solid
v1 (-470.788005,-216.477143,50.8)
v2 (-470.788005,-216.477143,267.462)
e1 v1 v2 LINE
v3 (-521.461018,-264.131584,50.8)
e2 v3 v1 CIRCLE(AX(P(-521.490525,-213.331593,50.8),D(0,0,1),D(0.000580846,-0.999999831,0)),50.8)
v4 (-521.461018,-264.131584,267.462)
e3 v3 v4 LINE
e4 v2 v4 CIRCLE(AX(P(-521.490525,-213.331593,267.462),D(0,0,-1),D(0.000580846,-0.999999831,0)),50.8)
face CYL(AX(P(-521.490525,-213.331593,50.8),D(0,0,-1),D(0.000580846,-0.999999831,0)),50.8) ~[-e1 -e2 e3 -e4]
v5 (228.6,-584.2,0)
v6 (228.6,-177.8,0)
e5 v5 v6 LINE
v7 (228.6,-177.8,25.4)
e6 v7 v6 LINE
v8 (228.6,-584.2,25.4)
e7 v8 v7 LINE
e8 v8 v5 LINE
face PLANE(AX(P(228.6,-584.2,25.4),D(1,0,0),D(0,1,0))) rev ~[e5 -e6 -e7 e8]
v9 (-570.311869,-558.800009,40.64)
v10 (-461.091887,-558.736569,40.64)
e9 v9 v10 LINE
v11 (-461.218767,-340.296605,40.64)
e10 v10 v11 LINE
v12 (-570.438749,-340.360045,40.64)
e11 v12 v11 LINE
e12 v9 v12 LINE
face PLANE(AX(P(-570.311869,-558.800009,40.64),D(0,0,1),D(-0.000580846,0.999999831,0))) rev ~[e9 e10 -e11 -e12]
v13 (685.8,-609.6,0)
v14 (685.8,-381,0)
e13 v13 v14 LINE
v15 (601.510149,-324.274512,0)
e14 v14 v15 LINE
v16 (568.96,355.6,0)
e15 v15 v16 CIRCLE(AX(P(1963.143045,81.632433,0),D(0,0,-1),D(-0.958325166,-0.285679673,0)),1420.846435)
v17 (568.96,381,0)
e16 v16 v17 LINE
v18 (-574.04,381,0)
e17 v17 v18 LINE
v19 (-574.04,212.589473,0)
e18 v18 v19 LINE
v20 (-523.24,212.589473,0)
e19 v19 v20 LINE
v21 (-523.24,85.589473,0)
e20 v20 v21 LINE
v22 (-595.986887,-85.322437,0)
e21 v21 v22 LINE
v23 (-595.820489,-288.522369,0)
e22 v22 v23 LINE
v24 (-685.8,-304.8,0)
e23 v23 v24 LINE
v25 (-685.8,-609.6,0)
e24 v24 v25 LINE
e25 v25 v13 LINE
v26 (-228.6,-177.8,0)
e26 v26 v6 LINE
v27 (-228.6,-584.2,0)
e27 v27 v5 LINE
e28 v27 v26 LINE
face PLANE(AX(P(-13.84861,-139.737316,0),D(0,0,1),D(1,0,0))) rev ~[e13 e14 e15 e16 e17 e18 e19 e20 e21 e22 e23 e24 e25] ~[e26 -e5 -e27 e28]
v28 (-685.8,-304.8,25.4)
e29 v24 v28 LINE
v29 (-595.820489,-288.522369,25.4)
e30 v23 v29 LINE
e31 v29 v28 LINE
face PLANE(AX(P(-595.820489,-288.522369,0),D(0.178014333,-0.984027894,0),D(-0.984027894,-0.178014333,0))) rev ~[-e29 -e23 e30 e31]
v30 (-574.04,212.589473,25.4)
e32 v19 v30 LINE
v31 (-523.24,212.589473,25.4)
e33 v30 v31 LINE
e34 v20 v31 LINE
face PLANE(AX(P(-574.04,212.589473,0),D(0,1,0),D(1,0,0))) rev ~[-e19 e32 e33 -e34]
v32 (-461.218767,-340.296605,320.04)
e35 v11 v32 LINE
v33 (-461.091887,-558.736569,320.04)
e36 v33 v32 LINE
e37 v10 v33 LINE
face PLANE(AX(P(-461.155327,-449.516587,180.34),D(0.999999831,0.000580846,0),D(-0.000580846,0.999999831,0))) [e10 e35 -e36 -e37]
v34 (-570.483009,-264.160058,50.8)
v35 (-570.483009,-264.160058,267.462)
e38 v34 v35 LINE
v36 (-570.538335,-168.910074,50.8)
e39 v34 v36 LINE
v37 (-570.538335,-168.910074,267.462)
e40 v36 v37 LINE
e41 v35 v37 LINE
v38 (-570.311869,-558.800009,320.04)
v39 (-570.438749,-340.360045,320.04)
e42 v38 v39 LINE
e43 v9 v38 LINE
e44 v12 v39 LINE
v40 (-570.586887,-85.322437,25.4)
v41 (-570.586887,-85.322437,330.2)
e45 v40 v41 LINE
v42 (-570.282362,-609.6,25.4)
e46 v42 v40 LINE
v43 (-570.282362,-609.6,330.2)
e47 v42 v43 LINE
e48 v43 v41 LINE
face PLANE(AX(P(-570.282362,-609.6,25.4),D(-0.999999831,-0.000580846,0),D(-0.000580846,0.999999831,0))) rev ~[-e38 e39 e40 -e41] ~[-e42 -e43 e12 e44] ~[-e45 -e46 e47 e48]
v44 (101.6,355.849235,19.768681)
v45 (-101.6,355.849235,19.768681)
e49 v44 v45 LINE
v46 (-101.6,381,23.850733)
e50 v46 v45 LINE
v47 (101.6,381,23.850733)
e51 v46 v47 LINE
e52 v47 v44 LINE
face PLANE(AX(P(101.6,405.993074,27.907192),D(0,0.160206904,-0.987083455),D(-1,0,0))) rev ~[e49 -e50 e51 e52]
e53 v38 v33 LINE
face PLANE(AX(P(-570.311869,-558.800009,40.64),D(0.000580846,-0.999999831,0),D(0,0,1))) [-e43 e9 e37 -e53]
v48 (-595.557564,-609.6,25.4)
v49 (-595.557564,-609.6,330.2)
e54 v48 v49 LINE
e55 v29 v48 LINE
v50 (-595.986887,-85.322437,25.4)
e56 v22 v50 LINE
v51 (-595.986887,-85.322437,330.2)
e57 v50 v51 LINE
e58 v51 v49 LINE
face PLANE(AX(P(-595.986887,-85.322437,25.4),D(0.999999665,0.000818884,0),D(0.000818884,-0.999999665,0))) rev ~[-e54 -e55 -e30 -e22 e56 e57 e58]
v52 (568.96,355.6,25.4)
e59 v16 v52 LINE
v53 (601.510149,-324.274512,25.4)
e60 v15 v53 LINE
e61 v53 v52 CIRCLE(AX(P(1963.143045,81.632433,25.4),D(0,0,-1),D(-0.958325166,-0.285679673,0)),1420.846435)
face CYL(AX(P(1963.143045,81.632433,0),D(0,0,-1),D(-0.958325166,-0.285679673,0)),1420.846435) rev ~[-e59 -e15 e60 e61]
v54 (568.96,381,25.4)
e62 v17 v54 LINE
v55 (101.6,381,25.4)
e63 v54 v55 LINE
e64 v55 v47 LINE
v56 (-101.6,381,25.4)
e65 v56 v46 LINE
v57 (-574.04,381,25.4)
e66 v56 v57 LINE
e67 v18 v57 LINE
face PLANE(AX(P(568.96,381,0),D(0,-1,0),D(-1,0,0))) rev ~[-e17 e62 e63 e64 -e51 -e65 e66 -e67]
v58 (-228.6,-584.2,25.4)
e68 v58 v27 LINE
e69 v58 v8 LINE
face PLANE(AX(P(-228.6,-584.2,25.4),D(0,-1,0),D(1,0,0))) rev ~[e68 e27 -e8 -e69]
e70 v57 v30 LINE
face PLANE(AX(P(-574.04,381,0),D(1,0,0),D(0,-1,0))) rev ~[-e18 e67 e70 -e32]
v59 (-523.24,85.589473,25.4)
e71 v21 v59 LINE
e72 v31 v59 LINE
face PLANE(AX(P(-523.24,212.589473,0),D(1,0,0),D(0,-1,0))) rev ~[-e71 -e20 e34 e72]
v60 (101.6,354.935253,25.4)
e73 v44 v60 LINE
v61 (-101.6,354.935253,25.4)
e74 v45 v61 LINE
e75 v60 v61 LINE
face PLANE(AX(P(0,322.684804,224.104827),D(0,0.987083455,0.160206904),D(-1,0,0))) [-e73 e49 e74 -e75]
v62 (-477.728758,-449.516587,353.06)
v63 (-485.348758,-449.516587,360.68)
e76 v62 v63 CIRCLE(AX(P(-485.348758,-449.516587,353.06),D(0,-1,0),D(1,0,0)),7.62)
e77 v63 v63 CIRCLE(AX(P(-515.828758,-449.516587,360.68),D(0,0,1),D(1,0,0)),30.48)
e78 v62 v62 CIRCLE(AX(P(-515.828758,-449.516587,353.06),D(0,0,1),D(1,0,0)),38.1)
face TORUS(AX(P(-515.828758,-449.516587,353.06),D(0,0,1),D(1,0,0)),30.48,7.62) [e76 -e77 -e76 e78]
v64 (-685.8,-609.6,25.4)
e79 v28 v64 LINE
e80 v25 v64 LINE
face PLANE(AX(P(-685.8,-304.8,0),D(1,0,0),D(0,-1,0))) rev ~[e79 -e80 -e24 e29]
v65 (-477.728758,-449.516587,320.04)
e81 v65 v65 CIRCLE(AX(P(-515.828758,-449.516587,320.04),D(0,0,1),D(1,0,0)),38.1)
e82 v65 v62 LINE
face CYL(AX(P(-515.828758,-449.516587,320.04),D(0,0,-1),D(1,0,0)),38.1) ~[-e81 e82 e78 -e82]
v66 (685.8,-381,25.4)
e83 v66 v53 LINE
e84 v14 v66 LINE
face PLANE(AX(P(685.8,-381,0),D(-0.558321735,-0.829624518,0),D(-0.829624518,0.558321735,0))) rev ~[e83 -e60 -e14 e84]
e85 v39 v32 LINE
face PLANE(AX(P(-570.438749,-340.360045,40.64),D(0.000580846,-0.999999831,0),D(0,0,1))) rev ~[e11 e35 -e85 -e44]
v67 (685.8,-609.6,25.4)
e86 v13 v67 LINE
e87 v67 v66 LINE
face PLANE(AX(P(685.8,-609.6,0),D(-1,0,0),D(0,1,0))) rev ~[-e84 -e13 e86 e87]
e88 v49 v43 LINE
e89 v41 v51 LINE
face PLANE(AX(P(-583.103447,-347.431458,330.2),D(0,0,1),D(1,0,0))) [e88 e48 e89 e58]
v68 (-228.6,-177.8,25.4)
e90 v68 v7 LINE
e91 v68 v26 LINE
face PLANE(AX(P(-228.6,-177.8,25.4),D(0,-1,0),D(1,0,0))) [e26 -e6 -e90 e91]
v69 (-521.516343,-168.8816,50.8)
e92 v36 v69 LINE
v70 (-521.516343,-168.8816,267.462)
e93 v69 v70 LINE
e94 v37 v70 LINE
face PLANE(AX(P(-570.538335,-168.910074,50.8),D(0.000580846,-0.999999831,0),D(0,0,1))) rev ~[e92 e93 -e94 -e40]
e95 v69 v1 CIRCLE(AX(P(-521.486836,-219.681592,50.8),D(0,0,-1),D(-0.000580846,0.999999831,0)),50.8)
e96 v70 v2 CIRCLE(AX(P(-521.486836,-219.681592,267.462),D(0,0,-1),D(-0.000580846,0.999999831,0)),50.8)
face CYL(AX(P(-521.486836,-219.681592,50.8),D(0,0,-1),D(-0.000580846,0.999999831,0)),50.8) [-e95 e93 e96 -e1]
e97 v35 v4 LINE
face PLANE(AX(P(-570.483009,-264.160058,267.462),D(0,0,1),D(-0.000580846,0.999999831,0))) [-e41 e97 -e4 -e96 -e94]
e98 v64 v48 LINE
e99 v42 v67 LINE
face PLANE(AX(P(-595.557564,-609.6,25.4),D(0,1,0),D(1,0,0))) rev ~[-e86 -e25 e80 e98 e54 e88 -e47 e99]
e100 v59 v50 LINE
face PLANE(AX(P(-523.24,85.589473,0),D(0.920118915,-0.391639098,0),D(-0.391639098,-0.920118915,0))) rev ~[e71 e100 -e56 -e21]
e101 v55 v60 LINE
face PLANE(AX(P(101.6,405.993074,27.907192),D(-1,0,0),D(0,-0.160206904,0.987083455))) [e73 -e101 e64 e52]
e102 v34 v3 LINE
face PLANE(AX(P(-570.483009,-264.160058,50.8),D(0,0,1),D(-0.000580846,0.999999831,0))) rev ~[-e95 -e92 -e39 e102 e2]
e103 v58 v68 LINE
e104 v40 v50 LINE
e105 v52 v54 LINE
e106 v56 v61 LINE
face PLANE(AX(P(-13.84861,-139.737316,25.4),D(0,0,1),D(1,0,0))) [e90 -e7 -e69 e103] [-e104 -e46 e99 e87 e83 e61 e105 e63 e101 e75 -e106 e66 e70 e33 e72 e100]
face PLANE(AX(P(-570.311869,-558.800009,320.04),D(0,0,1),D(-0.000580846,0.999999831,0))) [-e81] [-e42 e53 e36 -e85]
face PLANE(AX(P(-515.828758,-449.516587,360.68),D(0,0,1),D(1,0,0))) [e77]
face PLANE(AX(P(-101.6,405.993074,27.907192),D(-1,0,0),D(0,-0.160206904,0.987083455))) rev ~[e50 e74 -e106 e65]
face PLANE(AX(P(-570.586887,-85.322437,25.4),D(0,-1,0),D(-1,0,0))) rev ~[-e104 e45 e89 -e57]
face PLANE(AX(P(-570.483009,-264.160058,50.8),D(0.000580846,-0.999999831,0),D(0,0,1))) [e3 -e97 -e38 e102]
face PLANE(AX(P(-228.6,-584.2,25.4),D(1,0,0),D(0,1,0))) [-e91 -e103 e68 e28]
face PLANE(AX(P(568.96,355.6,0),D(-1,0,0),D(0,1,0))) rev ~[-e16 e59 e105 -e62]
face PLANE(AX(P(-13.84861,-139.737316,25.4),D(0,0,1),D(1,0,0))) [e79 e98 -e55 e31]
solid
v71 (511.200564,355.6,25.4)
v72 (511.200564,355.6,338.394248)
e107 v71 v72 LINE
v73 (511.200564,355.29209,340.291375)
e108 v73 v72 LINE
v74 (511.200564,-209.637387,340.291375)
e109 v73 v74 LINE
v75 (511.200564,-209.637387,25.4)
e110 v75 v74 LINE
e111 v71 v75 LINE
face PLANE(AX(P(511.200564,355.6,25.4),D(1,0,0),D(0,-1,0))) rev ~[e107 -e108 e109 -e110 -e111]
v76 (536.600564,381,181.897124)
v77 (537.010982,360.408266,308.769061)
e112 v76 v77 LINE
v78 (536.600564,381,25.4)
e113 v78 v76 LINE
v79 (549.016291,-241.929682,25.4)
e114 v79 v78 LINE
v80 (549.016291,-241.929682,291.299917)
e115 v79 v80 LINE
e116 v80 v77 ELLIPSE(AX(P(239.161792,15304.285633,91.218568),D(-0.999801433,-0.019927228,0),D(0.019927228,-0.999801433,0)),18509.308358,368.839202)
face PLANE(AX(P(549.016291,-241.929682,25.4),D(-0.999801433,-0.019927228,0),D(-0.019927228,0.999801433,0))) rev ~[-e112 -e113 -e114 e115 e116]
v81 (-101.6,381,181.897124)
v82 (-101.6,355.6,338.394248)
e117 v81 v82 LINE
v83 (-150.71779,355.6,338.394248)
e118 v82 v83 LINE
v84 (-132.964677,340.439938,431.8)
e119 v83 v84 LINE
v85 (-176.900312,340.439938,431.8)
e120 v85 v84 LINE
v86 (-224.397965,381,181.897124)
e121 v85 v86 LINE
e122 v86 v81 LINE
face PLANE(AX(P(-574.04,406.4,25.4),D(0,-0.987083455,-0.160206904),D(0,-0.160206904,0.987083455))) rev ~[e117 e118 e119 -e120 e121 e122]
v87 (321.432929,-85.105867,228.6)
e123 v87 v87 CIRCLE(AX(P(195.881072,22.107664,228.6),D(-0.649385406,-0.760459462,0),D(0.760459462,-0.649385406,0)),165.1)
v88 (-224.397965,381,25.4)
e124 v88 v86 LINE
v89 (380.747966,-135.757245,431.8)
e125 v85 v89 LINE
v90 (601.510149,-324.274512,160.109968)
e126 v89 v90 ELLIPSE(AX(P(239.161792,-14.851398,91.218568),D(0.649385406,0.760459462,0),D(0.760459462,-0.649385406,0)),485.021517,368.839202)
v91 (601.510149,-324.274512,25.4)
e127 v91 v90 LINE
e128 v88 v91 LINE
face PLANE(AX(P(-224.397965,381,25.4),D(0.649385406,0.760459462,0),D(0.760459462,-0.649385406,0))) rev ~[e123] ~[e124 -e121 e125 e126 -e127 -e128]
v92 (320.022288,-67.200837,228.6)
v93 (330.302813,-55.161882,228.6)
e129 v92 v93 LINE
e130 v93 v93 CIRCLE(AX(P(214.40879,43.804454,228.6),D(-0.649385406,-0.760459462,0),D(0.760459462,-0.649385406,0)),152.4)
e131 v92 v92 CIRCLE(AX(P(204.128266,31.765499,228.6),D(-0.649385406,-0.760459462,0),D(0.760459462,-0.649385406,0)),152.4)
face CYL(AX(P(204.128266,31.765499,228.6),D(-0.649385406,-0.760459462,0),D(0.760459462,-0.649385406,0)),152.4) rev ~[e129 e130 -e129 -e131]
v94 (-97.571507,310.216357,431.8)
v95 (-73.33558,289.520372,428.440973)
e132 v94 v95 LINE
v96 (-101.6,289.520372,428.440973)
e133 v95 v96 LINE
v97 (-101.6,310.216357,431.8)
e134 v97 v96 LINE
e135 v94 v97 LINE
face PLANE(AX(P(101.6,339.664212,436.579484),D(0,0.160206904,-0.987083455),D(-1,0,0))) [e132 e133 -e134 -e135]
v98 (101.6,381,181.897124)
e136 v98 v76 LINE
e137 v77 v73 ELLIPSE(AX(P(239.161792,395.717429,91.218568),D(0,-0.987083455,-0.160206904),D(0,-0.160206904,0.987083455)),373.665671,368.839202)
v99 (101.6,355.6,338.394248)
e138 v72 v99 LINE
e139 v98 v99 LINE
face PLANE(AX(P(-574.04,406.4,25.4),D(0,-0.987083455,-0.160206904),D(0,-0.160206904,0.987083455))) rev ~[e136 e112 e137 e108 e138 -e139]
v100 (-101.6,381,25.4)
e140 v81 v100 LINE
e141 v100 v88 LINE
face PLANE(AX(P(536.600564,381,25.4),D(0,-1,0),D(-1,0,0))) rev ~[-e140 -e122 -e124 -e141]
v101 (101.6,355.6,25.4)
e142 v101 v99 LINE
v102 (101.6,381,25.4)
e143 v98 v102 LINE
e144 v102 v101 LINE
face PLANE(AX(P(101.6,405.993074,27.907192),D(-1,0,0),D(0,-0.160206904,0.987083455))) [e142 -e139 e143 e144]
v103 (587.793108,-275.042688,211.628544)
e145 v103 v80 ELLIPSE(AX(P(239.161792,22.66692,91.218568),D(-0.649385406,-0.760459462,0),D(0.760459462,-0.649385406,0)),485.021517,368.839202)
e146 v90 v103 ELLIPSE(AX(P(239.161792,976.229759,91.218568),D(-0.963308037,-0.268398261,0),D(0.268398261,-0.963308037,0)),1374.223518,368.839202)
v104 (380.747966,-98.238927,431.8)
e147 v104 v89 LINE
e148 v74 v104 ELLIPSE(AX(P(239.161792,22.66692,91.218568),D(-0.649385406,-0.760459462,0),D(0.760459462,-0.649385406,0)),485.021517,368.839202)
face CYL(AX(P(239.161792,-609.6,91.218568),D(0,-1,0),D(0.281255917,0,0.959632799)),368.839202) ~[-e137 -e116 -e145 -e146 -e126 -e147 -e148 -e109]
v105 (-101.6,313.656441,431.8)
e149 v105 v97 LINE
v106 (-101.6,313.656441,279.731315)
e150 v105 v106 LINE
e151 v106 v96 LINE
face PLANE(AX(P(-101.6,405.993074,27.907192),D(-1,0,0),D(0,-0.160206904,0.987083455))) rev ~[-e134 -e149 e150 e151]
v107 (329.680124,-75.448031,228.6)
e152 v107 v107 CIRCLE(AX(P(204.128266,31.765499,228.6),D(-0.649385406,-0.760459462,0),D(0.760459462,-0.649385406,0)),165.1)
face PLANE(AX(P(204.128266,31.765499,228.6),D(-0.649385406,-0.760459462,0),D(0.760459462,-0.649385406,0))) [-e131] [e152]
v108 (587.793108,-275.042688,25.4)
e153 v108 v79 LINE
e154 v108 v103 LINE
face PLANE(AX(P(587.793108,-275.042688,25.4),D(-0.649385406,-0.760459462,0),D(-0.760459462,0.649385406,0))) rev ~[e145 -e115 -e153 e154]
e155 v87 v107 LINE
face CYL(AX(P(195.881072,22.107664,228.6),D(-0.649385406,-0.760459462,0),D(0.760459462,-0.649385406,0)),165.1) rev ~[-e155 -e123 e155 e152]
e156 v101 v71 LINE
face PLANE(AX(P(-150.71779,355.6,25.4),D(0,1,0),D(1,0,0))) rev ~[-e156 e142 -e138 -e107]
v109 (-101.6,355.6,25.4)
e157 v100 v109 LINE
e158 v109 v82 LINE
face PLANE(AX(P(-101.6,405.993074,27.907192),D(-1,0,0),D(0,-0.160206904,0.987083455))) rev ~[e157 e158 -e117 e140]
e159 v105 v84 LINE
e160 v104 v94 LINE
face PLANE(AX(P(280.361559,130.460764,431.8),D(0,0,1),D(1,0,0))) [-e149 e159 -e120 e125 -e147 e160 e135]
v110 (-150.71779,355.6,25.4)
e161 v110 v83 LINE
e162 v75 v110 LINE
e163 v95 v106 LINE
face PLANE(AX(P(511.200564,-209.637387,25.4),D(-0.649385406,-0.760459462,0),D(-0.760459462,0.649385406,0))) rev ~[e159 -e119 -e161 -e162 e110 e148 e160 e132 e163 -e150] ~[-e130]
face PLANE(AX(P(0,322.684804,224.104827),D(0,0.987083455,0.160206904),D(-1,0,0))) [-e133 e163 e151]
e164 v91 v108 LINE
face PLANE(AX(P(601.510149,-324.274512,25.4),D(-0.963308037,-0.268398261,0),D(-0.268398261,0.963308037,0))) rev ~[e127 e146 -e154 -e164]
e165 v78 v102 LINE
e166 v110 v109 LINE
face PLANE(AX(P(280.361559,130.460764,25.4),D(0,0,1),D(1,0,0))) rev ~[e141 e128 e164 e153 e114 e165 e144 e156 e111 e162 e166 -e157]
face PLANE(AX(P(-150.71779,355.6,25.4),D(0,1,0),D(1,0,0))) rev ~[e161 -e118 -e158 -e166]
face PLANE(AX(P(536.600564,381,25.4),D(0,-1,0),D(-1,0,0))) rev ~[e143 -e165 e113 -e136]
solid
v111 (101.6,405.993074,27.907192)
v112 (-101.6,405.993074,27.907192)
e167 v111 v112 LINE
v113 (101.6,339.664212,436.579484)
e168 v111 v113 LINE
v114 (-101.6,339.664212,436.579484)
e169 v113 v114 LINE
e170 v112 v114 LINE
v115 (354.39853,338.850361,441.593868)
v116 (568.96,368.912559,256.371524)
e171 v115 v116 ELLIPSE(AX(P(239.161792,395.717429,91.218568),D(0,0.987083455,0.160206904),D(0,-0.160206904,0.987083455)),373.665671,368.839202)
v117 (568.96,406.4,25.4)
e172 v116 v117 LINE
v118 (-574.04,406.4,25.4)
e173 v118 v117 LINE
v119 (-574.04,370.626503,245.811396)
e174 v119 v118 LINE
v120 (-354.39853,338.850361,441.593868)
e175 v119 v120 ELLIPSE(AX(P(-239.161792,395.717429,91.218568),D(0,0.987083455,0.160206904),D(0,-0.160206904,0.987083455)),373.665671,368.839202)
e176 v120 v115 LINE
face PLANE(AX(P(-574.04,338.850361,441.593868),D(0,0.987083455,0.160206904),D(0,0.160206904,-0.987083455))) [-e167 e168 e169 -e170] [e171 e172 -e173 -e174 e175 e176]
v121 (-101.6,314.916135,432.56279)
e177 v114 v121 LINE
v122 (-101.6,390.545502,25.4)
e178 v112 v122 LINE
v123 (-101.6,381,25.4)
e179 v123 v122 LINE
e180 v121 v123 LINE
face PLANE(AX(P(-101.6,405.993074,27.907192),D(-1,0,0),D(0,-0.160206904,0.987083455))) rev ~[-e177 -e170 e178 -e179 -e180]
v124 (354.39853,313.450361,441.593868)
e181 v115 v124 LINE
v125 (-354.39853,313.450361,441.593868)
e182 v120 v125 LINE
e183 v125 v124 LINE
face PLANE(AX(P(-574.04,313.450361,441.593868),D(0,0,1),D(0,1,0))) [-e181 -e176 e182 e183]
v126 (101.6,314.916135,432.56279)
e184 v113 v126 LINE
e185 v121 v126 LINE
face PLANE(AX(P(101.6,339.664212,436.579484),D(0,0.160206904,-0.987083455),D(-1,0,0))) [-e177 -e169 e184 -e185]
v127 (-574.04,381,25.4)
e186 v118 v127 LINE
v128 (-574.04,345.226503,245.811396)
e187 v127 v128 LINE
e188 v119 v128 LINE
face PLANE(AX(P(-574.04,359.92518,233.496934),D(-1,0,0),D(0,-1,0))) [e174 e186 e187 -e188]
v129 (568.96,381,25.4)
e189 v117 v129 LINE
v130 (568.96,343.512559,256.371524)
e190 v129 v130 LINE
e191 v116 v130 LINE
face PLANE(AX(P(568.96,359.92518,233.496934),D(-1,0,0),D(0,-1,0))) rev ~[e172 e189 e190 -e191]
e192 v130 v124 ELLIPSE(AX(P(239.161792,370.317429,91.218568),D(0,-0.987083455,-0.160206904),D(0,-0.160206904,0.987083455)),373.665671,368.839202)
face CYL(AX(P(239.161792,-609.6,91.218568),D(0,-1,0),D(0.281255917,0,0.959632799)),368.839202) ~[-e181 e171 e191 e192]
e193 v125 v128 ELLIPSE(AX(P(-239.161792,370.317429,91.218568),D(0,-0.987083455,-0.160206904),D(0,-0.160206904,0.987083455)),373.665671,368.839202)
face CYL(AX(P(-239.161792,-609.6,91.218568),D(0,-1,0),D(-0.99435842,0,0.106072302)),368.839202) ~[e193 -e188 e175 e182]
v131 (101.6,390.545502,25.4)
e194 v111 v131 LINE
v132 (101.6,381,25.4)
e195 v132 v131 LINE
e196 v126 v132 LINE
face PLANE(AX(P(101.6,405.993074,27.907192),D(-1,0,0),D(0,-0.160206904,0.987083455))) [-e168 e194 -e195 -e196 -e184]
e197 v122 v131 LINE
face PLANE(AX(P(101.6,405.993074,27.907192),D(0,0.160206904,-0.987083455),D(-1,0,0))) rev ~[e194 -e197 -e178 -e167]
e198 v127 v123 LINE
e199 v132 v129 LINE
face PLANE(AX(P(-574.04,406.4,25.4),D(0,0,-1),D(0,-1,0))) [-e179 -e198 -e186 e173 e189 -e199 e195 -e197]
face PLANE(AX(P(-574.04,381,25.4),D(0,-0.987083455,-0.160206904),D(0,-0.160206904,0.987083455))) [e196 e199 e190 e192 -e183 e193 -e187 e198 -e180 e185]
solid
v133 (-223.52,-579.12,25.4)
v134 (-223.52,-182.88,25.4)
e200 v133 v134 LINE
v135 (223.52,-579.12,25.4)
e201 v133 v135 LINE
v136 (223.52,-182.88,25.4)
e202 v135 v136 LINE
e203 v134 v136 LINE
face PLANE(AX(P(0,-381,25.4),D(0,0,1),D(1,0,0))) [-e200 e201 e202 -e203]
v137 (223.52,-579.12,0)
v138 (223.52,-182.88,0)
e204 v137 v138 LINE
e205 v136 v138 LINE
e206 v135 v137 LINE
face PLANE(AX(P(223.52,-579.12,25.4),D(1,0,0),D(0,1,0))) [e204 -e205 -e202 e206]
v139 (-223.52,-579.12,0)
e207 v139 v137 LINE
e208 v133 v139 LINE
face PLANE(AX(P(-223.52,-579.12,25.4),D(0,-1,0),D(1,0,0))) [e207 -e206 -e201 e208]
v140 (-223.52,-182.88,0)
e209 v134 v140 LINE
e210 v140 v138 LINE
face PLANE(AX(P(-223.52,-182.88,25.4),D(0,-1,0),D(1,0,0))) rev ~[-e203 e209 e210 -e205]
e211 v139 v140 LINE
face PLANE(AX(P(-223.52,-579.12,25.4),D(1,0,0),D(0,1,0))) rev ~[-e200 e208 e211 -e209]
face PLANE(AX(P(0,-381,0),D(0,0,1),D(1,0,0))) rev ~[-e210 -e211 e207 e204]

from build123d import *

# Parameters (mm, degrees)
F1_DEPTH     = 25.4
F2_W         = 457.2
F2_H         = 406.4
F3_DEPTH     = 25.4
F4_W         = 447.04
F4_H         = 396.24
F5_DEPTH     = 25.4
F7_DEPTH     = 1143
F9_DEPTH     = 406.4
F11_DEPTH    = 1143
F12_R        = 165.1
F13_DEPTH    = 12.7
F14_R        = 152.4
F15_DEPTH    = 25.4
F16_W        = 203.2
F16_H        = 414.02
F17_DEPTH    = 50.8
F19_DEPTH    = 990.6
F21_DEPTH    = 304.8
F22_W        = 218.44
F22_H        = 279.4
F23_DEPTH    = 109.22
F24_R        = 38.1
F25_DEPTH    = 40.64
F26_R        = 7.62
F27_W        = 95.25
F27_H        = 216.662
F28_DEPTH    = 99.822
F29_T1_DEPTH = 343.662


# Not quite as in the source:
# - a fillet or chamfer that OpenCascade refuses, or shapes differently, is made with other operations: its cross-section is extruded or revolved along the edge and cut away or added


with BuildPart() as f1:
    # F0 (on Top) → F1 (new body)
    with BuildSketch(Plane.XY):
        with BuildLine():
            Line((568.96, 381), (-574.04, 381))
            Line((-574.04, 381), (-574.04, 212.5894725323))
            Line((-574.04, 212.5894725323), (-523.24, 212.5894725323))
            Line((-523.24, 212.5894725323), (-523.24, 85.5894725323))
            Line((-523.24, 85.5894725323), (-595.9868865448, -85.3224374884))
            Line((-595.9868865448, -85.3224374884), (-595.8204893284, -288.5223693584))
            Line((-595.8204893284, -288.5223693584), (-685.8, -304.8))
            Line((-685.8, -304.8), (-685.8, -609.6))
            Line((-685.8, -609.6), (685.8, -609.6))
            Line((685.8, -609.6), (685.8, -381))
            Line((685.8, -381), (601.5101489935, -324.2745117491))
            ThreePointArc((601.5101489935, -324.2745117491), (543.9222330335, 13.6848215504), (568.96, 355.6))
            Line((568.96, 355.6), (568.96, 381))
        make_face()
    extrude(amount=F1_DEPTH)

    # F2 (on face) → F3 (cut)
    with BuildSketch(Plane.XY.offset(25.4)):
        with Locations((0, -381)):
            Rectangle(F2_W, F2_H)
    extrude(amount=-F3_DEPTH, mode=Mode.SUBTRACT)


with BuildPart() as f5:
    # F4 (on face) → F5 (new body)
    with BuildSketch(Plane.XY.offset(25.4)):
        with Locations((0, -381)):
            Rectangle(F4_W, F4_H)
    extrude(amount=-F5_DEPTH)


with BuildPart() as f7:
    # F6 (on face) → F7 (new body)
    with BuildSketch(Plane(origin=(-574.04, 0, 0), x_dir=(0, -1, 0), z_dir=(-1, 0, 0))):
        Polygon((-406.4, 25.4), (-381, 25.4), (-313.450360893, 441.593868115), (-338.850360893, 441.593868115), align=None)
    extrude(amount=-F7_DEPTH)


with BuildPart() as f9:
    # F8 (on face) → F9 (new body)
    with BuildSketch(Plane.XY.offset(25.4)):
        Polygon((601.5101489935, -324.2745117491), (587.793108051, -275.0426883363), (549.0162910079, -241.9296818818), (536.6005640478, 381), (511.2005640478, 381), (-180.4623305798, 381), (-224.3979649328, 381), align=None)
        Polygon((511.2005640478, -209.6373869903), (-150.7177903415, 355.6), (511.2005640478, 355.6), align=None, mode=Mode.SUBTRACT)
    extrude(amount=F9_DEPTH)

    # F10 (on face) → F11 (cut)
    with BuildSketch(Plane(origin=(-574.04, 0, 0), x_dir=(0, -1, 0), z_dir=(-1, 0, 0))):
        Polygon((-401.2590646744, 460.1649348316), (-406.4, 25.4), (-335.8362154414, 460.1649348316), align=None)
    extrude(amount=-F11_DEPTH, mode=Mode.SUBTRACT)

    # F12 (on face) → F13 (cut)
    with BuildSketch(Plane(origin=(93.5207792511, 109.5170307696, 0), x_dir=(0.7604594625, -0.6493854063, 0), z_dir=(-0.6493854063, -0.7604594625, 0))):
        with Locations((134.6032201509, 228.6)):
            Circle(F12_R)
    extrude(amount=-F13_DEPTH, mode=Mode.SUBTRACT)

    # F14 (on face) → F15 (cut)
    with BuildSketch(Plane(origin=(101.767973911, 119.1748659433, 0), x_dir=(0.7604594625, -0.6493854063, 0), z_dir=(-0.6493854063, -0.7604594625, 0))):
        with Locations((134.6032201509, 228.6)):
            Circle(F14_R)
    extrude(amount=-F15_DEPTH, mode=Mode.SUBTRACT)


with BuildPart() as f17_tool:
    # F16 (on face) → F17 (new body)
    with BuildSketch(Plane(origin=(0, 399.9859297679, 64.9190371931), x_dir=(-1, 0, 0), z_dir=(0, 0.9870834554, 0.1602069042))):
        with Locations((0, 169.5138338797)):
            Rectangle(F16_W, F16_H)
    extrude(amount=-F17_DEPTH)


with BuildPart() as f1_1:
    add(f1.part)

    # F17: cut by f17_tool
    add(f17_tool.part, mode=Mode.SUBTRACT)

    # F20 (on face) → F21 (join)
    with BuildSketch(Plane.XY.offset(25.4)):
        Polygon((-570.2823618796, -609.6), (-570.5868865448, -85.3224374884), (-595.9868865448, -85.3224374884), (-595.5575639255, -609.6), align=None)
    extrude(amount=F21_DEPTH)

    # F22 (on face) → F23 (join)
    with BuildSketch(Plane(origin=(-570.6362532415, -0.3314519377, 0), x_dir=(-0.0005808462, 0.9999998313, 0), z_dir=(0.9999998313, 0.0005808462, 0))):
        with Locations((-449.2486508406, 180.34)):
            Rectangle(F22_W, F22_H)
    extrude(amount=F23_DEPTH)

    # F24 (on face) → F25 (join)
    with BuildSketch(Plane.XY.offset(320.04)):
        with Locations((-515.8287581144, -449.5165869753)):
            Circle(F24_R)
    extrude(amount=F25_DEPTH)

    # F26
    f26_edges = [f1_1.edges().sort_by_distance(p)[0] for p in [
        (-553.928758, -449.516587, 360.68),
    ]]
    fillet(f26_edges, radius=F26_R)

    # F27 (on face) → F28 (join)
    with BuildSketch(Plane(origin=(-570.6362532415, -0.3314519377, 0), x_dir=(-0.0005808462, 0.9999998313, 0), z_dir=(0.9999998313, 0.0005808462, 0))):
        with Locations((-216.2036508406, 159.131)):
            Rectangle(F27_W, F27_H)
    extrude(amount=F28_DEPTH)

    # F29: fillet of radius 50.8 on 2 edges, made by hand

    # F29_s2 → F29_t1 (cut)
    with BuildSketch(Plane.XY.offset(50.8)):
        with BuildLine():
            ThreePointArc((-521.5163432475, -168.8816000996), (-485.5866824268, -183.7397085159), (-470.6868448316, -219.6520845447))
            Line((-470.6868448316, -219.6520845447), (-470.716351817, -168.8520931142))
            Line((-470.716351817, -168.8520931142), (-521.5163432475, -168.8816000996))
        make_face()
        with BuildLine():
            ThreePointArc((-521.4610176499, -264.1315840318), (-485.5486416211, -249.2317464365), (-470.6905332048, -213.3020856159))
            Line((-470.6905332048, -213.3020856159), (-470.6610262194, -264.1020770464))
            Line((-470.6610262194, -264.1020770464), (-521.4610176499, -264.1315840318))
        make_face()
    extrude(amount=F29_T1_DEPTH, mode=Mode.SUBTRACT)


with BuildPart() as f7_1:
    add(f7.part)

    # F17: cut by f17_tool
    add(f17_tool.part, mode=Mode.SUBTRACT)


with BuildPart() as f9_1:
    add(f9.part)

    # F17: cut by f17_tool
    add(f17_tool.part, mode=Mode.SUBTRACT)


with BuildPart() as f19_tool:
    # F18 (on face) → F19 (new body)
    with BuildSketch(Plane.XZ.offset(609.6)):
        with BuildLine():
            Line((605.9201579013, 445.1687633991), (566.9001340866, 445.1687633991))
            Line((566.9001340866, 445.1687633991), (342.9, 445.1687633991))
            ThreePointArc((342.9, 445.1687633991), (522.2177920978, 327.696172597), (605.9201579013, 130.3421908498))
            Line((605.9201579013, 130.3421908498), (605.9201579013, 235.2843816996))
            Line((605.9201579013, 235.2843816996), (605.9201579013, 445.1687633991))
        make_face()
        with BuildLine():
            Line((-342.9, 445.1687633991), (-566.9001340866, 445.1687633991))
            Line((-566.9001340866, 445.1687633991), (-605.9201579013, 445.1687633991))
            Line((-605.9201579013, 445.1687633991), (-605.9201579013, 235.2843816996))
            Line((-605.9201579013, 235.2843816996), (-605.9201579013, 130.3421908498))
            ThreePointArc((-605.9201579013, 130.3421908498), (-522.2177920978, 327.696172597), (-342.9, 445.1687633991))
        make_face()
    extrude(amount=-F19_DEPTH)


with BuildPart() as f7_2:
    add(f7_1.part)

    # F19: cut by f19_tool
    add(f19_tool.part, mode=Mode.SUBTRACT)


with BuildPart() as f9_2:
    add(f9_1.part)

    # F19: cut by f19_tool
    add(f19_tool.part, mode=Mode.SUBTRACT)


solid = Compound([f5.part, f1_1.part, f7_2.part, f9_2.part])
